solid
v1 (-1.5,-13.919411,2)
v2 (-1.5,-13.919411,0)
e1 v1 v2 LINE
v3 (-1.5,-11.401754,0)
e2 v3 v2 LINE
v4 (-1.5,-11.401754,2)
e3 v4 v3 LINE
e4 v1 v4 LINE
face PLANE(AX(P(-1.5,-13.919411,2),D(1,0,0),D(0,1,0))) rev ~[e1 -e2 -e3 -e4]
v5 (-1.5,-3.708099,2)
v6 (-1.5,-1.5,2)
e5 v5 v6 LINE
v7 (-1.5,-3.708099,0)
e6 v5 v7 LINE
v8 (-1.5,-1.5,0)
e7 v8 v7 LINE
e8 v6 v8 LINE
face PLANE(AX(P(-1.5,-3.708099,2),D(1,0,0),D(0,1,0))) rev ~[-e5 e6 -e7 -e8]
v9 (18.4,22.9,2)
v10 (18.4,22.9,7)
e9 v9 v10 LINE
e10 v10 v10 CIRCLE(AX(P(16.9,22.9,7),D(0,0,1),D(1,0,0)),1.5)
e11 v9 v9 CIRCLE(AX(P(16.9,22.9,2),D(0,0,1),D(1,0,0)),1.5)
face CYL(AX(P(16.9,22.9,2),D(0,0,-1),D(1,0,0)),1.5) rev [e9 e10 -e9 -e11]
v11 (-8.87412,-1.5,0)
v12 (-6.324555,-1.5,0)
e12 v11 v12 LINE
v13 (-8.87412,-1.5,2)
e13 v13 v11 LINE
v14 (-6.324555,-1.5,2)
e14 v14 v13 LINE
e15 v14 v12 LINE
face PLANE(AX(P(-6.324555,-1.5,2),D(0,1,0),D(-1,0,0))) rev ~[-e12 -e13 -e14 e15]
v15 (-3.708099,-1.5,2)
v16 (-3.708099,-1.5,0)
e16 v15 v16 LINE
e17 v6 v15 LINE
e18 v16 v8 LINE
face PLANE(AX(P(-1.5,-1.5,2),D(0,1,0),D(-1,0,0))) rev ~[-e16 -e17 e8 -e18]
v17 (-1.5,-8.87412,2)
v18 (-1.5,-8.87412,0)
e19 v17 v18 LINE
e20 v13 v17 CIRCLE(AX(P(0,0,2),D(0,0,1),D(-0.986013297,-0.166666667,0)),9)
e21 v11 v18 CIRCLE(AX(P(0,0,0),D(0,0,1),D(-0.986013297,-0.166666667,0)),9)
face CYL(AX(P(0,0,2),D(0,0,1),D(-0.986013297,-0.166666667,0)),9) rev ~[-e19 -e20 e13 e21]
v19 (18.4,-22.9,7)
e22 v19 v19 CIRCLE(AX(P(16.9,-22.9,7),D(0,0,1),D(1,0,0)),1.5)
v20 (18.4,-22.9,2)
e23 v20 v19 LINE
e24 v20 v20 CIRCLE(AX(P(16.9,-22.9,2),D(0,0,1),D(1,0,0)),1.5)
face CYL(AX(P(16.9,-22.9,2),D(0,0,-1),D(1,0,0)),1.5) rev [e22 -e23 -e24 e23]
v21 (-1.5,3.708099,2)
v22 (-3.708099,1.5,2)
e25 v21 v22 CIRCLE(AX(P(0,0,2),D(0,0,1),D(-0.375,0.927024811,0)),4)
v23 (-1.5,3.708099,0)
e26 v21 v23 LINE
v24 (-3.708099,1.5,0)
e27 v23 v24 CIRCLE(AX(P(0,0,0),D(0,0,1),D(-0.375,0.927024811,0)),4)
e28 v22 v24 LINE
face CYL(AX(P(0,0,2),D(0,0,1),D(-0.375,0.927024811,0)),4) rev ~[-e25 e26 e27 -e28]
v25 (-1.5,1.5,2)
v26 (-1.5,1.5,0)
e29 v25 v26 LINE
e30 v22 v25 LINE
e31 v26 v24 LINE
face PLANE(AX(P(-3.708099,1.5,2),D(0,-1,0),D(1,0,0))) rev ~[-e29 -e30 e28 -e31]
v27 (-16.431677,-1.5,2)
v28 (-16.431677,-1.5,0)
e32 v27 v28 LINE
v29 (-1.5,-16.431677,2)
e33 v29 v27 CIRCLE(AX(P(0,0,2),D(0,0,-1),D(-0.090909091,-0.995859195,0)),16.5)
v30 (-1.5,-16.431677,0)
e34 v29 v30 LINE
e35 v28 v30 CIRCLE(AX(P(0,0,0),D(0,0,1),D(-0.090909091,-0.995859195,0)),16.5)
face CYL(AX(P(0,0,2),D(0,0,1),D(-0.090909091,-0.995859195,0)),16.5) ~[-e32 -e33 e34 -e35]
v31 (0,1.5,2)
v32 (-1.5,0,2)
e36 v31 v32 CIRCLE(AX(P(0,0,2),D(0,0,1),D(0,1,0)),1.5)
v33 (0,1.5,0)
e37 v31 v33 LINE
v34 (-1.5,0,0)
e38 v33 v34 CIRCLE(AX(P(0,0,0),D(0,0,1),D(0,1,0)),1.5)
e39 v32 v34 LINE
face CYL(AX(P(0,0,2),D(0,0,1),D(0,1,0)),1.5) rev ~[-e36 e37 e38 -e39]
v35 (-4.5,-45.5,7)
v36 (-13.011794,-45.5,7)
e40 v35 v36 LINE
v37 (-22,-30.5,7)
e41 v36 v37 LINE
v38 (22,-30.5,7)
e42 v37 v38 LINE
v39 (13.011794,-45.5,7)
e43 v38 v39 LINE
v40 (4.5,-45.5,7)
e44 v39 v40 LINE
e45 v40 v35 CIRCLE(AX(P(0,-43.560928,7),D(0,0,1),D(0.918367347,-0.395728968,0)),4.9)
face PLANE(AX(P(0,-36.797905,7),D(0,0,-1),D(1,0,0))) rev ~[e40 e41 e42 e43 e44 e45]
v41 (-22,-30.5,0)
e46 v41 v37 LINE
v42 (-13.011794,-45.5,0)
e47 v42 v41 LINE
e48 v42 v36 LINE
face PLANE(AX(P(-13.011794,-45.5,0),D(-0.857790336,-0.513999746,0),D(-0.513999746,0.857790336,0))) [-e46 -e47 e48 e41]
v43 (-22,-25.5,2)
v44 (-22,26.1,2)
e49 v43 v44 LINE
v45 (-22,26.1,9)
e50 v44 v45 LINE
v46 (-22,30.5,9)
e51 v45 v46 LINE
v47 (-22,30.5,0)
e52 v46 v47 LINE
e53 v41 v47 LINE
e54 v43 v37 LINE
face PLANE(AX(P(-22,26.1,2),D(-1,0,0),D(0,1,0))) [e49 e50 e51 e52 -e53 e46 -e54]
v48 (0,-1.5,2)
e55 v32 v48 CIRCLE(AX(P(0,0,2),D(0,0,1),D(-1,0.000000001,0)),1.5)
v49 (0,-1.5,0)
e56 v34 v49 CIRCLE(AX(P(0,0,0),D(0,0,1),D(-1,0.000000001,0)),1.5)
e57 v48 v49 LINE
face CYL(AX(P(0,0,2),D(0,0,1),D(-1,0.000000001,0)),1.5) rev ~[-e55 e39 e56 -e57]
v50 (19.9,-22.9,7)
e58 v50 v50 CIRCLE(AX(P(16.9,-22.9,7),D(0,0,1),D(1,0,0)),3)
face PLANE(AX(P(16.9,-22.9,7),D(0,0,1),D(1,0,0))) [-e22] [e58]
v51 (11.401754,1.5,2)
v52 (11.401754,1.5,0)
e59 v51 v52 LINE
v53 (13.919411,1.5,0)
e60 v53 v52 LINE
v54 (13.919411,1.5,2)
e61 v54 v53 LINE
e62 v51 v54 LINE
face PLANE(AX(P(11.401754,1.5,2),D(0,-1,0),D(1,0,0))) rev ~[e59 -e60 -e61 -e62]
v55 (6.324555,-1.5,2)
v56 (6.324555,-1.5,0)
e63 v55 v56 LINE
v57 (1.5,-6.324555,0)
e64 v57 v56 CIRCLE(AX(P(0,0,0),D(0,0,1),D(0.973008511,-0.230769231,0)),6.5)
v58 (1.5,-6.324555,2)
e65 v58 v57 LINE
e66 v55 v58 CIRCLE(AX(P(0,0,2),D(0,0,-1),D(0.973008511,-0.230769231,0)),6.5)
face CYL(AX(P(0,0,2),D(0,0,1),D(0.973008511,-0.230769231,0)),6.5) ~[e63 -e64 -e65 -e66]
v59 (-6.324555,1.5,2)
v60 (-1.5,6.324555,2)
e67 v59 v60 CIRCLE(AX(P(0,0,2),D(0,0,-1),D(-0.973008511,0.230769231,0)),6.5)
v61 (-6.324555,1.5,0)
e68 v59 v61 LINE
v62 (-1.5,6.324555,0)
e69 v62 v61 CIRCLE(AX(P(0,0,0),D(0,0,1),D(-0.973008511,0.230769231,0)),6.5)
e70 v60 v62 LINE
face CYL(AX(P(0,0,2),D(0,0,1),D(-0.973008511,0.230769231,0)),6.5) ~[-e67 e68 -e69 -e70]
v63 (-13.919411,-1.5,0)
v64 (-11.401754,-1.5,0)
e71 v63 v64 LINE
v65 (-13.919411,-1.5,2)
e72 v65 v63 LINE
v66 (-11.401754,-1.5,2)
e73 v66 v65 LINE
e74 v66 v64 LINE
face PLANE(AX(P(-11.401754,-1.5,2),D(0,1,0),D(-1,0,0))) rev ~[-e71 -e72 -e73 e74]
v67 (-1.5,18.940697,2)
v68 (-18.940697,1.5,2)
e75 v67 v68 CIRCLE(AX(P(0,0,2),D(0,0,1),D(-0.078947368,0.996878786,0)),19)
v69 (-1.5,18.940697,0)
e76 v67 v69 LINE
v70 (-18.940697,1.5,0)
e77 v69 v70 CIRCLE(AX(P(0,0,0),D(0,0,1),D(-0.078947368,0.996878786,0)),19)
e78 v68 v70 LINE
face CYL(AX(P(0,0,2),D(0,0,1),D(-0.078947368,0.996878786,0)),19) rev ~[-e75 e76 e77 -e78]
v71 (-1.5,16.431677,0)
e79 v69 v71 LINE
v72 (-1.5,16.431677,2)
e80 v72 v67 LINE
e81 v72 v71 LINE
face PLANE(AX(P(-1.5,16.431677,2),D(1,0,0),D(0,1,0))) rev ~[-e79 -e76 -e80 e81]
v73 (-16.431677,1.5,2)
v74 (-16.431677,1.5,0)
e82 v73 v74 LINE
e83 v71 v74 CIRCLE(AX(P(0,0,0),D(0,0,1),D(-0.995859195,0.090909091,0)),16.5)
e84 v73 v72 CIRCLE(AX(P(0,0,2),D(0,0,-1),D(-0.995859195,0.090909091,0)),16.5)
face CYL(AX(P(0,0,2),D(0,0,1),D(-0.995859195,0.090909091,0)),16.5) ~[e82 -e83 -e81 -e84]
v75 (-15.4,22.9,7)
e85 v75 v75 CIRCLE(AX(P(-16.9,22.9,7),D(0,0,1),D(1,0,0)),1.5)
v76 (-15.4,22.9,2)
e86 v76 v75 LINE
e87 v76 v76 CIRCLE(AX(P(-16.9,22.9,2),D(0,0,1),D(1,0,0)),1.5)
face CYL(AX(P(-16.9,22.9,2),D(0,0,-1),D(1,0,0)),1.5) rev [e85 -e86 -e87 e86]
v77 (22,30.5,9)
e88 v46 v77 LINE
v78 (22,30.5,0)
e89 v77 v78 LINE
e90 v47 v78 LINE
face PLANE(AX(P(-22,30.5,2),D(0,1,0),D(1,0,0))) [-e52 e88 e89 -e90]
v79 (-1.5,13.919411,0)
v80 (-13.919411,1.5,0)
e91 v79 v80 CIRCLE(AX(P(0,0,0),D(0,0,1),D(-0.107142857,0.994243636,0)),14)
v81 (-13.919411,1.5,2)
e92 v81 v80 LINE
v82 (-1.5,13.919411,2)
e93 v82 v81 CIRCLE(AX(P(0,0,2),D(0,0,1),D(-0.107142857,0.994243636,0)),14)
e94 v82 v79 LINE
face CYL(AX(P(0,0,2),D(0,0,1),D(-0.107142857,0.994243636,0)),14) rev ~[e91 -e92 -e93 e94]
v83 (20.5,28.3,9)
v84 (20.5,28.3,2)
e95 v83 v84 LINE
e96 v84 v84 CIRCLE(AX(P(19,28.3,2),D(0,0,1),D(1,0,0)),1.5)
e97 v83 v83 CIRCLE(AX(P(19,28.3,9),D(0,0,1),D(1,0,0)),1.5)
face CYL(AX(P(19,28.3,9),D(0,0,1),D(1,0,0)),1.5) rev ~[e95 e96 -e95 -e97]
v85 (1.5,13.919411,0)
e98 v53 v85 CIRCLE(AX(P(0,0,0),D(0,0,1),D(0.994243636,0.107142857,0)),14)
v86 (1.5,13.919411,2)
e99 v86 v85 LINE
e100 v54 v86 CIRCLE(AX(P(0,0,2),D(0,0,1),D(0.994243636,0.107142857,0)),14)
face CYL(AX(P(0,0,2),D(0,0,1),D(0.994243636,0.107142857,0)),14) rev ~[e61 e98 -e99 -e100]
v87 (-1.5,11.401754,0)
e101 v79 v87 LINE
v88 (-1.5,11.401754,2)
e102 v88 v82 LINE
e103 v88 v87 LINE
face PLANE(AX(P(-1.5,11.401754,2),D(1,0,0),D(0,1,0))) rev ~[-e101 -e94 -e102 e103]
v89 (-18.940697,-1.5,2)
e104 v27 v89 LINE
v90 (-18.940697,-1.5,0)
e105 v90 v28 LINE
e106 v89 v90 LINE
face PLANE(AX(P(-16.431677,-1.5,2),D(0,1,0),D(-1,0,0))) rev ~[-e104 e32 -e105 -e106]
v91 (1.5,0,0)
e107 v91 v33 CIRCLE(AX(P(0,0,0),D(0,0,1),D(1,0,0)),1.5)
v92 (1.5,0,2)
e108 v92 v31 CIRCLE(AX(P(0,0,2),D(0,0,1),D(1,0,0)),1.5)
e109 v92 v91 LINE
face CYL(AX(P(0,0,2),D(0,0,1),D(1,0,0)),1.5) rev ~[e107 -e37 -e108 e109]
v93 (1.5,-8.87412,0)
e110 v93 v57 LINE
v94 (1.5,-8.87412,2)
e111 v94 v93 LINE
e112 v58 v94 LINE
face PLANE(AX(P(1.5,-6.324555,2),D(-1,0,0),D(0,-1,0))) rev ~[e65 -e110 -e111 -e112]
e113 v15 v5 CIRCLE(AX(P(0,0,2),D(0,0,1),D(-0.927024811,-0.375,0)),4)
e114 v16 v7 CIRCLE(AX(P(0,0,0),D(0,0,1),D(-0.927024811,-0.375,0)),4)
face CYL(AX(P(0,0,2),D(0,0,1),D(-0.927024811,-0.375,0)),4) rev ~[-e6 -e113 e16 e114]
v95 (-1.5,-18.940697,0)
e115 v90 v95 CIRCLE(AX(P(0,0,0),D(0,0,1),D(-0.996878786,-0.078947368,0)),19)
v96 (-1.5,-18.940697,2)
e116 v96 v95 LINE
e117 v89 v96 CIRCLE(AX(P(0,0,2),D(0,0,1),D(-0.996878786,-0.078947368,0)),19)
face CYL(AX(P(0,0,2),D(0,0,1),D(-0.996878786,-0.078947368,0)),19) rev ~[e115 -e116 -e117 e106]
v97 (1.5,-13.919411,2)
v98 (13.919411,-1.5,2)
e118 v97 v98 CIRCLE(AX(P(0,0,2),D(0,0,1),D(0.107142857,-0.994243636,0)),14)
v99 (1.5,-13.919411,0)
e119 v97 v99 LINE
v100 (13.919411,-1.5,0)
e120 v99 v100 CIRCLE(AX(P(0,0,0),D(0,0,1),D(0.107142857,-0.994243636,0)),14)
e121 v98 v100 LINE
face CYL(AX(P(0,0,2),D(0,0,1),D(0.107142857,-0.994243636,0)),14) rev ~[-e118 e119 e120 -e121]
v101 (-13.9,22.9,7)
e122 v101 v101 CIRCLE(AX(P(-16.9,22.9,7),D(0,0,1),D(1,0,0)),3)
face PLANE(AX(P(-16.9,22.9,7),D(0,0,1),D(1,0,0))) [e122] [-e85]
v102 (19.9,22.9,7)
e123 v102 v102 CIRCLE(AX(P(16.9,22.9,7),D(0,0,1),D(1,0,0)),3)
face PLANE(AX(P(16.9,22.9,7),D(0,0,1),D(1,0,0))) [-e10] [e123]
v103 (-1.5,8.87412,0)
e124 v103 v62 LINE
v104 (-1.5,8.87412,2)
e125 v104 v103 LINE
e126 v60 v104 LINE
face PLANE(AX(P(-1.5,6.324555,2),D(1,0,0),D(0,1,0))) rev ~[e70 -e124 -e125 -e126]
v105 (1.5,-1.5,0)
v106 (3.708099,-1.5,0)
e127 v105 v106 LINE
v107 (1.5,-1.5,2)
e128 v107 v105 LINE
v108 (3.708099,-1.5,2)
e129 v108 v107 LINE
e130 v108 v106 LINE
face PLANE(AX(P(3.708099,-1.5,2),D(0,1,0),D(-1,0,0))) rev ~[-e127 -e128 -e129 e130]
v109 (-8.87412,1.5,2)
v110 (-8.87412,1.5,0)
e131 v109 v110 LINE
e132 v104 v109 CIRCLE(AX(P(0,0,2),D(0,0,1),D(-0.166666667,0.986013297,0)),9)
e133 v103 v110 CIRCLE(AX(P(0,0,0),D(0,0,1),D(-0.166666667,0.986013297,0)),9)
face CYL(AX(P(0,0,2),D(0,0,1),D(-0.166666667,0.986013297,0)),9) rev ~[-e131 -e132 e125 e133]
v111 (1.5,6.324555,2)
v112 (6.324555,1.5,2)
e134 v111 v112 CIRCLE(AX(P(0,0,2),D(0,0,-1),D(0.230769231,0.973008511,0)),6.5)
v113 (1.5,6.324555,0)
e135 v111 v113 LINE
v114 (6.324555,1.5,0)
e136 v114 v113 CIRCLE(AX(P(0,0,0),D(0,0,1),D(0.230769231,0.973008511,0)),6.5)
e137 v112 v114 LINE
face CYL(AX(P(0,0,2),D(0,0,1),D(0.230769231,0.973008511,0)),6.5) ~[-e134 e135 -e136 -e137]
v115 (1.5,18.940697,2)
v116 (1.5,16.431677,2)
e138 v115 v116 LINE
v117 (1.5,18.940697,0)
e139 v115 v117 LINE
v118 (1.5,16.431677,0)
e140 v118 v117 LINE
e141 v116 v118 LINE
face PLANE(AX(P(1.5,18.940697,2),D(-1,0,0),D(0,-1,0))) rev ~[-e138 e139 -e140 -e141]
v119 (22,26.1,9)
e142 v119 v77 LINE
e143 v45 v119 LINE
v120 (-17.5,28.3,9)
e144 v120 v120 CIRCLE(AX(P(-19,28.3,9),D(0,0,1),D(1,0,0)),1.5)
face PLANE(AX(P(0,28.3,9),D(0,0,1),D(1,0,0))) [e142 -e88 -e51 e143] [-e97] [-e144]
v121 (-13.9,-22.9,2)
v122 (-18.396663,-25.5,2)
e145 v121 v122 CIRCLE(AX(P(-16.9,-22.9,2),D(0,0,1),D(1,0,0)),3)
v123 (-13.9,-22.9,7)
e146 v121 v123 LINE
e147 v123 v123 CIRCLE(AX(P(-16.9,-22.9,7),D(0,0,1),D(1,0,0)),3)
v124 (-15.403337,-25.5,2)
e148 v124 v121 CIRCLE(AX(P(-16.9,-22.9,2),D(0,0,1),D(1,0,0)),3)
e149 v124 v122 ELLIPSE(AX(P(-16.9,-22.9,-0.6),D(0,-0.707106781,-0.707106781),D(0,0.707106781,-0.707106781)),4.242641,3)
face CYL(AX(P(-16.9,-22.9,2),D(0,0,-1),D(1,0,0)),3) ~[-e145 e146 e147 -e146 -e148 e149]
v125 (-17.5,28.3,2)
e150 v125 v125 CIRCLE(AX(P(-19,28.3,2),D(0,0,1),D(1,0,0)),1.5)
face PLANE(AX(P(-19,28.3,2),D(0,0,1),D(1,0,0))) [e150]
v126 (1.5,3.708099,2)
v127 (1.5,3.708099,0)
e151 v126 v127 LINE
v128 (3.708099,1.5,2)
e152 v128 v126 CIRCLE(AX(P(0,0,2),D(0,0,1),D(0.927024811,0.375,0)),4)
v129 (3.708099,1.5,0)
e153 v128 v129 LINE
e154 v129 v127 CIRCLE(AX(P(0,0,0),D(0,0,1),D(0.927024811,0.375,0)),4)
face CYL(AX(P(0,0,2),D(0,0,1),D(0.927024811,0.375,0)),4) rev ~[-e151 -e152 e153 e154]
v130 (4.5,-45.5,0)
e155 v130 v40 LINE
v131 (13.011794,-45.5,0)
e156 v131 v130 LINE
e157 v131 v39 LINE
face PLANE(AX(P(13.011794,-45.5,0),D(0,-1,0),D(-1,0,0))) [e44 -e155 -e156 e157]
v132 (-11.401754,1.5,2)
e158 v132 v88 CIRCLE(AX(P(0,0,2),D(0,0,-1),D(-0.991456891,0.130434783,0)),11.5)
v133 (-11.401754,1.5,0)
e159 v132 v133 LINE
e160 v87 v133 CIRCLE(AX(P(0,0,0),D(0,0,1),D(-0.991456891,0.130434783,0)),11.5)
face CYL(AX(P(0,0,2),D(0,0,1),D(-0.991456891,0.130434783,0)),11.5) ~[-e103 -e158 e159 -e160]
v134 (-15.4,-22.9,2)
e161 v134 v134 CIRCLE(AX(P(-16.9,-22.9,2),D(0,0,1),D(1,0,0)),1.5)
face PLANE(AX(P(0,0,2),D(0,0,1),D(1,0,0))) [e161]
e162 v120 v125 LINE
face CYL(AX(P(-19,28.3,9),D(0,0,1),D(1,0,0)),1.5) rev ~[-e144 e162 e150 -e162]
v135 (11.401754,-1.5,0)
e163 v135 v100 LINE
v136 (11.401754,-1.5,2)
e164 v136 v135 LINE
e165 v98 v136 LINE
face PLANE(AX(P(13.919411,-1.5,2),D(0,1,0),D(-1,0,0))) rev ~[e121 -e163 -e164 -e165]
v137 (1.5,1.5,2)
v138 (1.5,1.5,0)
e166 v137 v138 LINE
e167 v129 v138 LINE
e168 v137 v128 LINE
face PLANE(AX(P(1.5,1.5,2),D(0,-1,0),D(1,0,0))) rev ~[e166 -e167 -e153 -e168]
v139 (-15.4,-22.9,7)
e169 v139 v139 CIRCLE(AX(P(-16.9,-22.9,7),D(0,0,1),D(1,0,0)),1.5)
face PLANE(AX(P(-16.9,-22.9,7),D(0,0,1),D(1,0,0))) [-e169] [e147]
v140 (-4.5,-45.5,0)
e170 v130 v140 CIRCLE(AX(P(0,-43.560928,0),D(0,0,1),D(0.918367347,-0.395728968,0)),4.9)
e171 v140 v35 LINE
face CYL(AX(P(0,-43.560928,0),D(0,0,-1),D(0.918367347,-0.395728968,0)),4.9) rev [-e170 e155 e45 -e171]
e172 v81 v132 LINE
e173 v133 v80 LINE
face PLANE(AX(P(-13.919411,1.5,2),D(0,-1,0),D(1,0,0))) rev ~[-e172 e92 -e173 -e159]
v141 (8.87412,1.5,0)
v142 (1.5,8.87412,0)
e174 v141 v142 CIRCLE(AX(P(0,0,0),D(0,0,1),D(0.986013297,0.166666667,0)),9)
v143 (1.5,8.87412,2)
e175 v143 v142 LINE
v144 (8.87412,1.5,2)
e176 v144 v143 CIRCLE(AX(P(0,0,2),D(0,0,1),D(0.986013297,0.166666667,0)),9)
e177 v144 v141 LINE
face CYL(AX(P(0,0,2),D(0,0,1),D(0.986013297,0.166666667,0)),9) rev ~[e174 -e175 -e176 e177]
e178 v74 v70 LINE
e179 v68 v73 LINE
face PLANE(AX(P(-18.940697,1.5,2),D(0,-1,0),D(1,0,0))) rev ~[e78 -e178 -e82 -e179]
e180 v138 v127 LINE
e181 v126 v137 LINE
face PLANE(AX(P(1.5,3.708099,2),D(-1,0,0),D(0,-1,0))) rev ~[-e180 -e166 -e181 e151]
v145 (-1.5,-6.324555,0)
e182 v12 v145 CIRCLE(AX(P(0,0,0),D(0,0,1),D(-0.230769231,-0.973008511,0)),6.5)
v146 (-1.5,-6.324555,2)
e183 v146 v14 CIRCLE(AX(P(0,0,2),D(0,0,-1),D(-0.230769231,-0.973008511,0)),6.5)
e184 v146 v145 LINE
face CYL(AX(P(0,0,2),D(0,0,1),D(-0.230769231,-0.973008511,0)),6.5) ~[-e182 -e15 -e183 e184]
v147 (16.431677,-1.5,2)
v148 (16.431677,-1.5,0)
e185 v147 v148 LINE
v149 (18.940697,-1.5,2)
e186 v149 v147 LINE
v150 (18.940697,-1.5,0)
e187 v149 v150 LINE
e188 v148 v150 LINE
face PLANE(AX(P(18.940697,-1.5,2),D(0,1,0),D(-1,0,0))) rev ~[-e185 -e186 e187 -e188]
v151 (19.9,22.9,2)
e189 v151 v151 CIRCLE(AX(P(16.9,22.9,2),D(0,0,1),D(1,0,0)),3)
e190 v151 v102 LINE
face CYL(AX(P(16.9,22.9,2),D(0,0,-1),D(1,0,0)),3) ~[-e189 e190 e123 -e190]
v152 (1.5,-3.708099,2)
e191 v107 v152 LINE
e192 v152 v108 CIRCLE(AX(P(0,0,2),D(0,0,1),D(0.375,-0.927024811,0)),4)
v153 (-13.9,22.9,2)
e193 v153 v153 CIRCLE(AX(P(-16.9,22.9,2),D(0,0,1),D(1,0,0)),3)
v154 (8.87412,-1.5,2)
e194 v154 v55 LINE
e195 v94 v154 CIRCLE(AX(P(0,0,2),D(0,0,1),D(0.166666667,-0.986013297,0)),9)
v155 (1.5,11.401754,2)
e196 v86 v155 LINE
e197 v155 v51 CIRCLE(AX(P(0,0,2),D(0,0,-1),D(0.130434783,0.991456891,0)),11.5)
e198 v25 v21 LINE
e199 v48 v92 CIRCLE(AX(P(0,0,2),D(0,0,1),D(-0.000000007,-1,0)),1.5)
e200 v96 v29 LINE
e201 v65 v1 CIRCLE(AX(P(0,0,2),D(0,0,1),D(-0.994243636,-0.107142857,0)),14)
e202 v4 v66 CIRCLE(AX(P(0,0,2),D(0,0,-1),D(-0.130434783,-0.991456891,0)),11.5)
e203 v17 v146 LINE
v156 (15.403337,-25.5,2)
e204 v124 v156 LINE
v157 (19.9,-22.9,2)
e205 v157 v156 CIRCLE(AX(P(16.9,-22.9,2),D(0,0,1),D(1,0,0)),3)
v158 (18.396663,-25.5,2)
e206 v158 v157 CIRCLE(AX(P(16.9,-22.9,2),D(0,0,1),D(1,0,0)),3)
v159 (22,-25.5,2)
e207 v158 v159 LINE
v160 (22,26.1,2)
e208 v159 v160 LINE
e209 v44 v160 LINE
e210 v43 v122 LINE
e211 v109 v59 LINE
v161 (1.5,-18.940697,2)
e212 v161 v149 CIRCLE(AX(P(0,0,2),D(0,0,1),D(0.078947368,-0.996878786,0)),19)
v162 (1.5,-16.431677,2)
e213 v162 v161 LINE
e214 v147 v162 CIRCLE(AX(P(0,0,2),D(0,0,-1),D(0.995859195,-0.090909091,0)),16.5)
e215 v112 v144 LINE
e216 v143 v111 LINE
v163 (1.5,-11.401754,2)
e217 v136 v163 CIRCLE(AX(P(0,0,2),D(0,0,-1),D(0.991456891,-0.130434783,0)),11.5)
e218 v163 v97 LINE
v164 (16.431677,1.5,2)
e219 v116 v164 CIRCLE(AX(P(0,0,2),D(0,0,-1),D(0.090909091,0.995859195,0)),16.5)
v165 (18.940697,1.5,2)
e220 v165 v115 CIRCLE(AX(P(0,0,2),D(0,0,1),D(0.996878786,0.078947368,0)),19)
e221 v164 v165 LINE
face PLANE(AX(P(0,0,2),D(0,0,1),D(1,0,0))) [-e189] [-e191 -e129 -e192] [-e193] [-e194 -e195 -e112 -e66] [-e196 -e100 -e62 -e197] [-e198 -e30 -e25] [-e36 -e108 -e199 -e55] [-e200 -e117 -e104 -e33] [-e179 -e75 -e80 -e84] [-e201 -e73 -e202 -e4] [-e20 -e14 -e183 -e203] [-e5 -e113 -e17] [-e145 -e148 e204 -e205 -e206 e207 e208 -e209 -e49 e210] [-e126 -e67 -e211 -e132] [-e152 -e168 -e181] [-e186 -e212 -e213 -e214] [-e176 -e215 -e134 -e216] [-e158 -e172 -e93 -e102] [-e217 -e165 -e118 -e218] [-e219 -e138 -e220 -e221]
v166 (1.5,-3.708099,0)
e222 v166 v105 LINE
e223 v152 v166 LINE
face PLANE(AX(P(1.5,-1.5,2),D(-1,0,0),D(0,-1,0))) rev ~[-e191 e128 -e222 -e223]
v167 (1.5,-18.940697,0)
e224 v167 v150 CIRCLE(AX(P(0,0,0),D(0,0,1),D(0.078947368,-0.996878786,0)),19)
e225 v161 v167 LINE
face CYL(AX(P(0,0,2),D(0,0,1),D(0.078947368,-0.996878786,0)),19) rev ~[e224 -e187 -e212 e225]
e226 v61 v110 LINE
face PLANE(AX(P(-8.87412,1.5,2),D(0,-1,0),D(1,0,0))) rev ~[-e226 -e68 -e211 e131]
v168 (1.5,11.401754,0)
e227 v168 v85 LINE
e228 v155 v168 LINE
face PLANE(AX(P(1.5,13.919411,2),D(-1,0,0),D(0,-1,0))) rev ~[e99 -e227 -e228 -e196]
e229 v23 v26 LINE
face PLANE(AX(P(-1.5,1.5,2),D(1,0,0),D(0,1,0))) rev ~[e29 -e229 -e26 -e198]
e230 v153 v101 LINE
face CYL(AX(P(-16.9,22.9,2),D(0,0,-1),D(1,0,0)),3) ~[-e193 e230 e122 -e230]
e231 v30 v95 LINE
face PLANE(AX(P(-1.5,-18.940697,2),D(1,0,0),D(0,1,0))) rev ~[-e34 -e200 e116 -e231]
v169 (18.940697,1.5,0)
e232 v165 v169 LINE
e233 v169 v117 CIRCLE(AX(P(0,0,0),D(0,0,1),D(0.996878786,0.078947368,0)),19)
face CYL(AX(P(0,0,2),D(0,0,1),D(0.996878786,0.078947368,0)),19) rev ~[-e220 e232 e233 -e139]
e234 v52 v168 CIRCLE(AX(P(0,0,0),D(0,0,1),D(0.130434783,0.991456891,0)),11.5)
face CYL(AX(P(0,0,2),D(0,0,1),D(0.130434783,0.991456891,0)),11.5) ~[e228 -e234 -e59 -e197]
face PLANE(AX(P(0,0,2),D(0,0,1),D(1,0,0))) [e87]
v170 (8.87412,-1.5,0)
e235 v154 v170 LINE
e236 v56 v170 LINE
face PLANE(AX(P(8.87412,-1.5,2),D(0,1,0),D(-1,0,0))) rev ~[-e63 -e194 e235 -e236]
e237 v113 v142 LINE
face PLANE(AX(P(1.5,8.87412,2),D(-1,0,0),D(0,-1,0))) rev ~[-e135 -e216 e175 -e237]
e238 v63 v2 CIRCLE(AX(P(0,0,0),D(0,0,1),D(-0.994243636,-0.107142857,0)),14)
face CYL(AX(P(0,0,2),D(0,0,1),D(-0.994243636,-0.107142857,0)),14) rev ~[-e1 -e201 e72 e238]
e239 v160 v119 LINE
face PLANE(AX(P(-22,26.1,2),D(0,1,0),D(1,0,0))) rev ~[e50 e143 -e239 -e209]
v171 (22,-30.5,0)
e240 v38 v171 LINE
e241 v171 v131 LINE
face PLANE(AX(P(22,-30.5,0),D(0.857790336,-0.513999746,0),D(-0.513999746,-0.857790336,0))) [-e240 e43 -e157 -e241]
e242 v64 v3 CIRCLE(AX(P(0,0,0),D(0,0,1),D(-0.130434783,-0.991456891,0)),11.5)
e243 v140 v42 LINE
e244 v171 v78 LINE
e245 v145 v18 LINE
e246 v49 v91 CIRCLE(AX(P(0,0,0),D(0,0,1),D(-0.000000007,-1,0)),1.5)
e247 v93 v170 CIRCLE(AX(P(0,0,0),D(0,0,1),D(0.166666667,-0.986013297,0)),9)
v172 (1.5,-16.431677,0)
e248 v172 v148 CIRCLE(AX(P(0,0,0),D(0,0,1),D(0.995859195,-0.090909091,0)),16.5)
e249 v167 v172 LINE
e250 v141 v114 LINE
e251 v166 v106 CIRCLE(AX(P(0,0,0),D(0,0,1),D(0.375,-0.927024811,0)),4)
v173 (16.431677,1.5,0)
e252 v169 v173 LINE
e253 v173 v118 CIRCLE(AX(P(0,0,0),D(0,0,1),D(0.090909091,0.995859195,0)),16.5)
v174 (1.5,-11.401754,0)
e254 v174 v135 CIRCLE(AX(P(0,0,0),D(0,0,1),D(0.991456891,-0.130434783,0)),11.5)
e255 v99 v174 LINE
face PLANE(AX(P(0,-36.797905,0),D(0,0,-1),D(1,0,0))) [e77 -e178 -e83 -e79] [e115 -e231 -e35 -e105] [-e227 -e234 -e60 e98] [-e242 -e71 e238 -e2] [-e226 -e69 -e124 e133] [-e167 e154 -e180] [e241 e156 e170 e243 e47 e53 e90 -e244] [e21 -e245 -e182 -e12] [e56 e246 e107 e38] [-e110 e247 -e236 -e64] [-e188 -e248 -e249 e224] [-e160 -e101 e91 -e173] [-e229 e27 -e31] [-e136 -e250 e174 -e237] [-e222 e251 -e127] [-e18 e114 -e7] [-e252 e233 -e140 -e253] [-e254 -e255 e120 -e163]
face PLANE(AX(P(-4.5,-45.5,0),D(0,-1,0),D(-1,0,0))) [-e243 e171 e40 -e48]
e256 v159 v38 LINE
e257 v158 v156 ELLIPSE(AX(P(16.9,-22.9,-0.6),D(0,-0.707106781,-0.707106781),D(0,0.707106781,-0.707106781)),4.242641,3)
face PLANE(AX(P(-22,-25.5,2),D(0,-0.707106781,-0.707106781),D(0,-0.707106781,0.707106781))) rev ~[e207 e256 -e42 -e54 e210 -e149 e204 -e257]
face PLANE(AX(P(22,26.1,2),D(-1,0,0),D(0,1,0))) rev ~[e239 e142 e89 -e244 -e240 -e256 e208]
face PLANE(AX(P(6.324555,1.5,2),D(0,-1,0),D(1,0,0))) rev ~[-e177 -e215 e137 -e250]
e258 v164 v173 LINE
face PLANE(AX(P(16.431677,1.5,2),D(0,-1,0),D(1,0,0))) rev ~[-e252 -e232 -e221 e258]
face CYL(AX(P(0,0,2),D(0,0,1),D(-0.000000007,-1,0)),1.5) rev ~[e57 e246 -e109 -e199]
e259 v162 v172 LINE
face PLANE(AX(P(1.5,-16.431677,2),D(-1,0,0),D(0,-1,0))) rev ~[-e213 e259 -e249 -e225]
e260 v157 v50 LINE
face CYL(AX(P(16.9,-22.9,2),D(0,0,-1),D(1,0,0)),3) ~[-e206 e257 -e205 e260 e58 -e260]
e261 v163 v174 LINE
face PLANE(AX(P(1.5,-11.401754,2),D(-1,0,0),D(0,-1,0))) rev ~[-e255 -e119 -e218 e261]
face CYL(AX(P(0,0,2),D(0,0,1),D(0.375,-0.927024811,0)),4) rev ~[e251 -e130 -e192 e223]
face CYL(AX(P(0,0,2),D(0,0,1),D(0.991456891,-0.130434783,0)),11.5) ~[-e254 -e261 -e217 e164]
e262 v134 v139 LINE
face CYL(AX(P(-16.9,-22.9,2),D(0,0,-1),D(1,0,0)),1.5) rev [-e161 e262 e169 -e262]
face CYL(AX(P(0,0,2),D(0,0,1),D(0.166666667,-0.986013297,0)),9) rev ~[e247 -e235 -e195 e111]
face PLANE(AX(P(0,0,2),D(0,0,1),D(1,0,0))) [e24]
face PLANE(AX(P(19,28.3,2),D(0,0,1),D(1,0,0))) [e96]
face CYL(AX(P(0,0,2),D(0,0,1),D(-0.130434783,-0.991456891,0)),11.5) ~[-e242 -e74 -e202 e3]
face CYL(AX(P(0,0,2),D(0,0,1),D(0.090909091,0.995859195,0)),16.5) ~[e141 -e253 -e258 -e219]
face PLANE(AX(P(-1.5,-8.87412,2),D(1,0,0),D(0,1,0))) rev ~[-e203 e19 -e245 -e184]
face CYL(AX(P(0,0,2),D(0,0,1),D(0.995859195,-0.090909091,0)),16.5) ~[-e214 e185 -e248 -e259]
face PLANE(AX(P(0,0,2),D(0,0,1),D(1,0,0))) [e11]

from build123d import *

# Parameters (mm, degrees)
F0_W        = 44
F0_H        = 61
F1_DEPTH    = 2
F3_DEPTH    = 7
F4_R        = 3
F4_R_2      = 1.5
F5_DEPTH    = 5
F6_T4_DEPTH = 44
F7_W        = 44
F7_H        = 4.4
F8_DEPTH    = 7
F9_R        = 1.5
F10_DEPTH   = 7
F12_DEPTH   = 2.001


# Not quite as in the source:
# - a fillet or chamfer that OpenCascade refuses, or shapes differently, is made with other operations: its cross-section is extruded or revolved along the edge and cut away or added


with BuildPart() as f1:
    # F0 (on Top) → F1 (new body)
    with BuildSketch(Plane.XY):
        Rectangle(F0_W, F0_H)
    extrude(amount=F1_DEPTH)

    # F2 (on face) → F3 (join)
    with BuildSketch(Plane(origin=(0, 0, 0), x_dir=(1, 0, 0), z_dir=(0, 0, -1))):
        with BuildLine():
            Line((-13.0117940697, 45.5), (-22, 30.5))
            Line((-22, 30.5), (22, 30.5))
            Line((22, 30.5), (13.0117940697, 45.5))
            Line((13.0117940697, 45.5), (4.5, 45.5))
            ThreePointArc((4.5, 45.5), (0, 38.660928057), (-4.5, 45.5))
            Line((-4.5, 45.5), (-13.0117940697, 45.5))
        make_face()
    extrude(amount=-F3_DEPTH)

    # F4 (on face) → F5 (join)
    with BuildSketch(Plane.XY.offset(2)):
        with Locations((-16.9, 22.9)):
            Circle(F4_R)
        with Locations((-16.9, 22.9)):
            Circle(F4_R_2, mode=Mode.SUBTRACT)
        with Locations((16.9, 22.9)):
            Circle(F4_R)
        with Locations((16.9, 22.9)):
            Circle(F4_R_2, mode=Mode.SUBTRACT)
        with Locations((16.9, -22.9)):
            Circle(F4_R)
        with Locations((16.9, -22.9)):
            Circle(F4_R_2, mode=Mode.SUBTRACT)
        with Locations((-16.9, -22.9)):
            Circle(F4_R)
        with Locations((-16.9, -22.9)):
            Circle(F4_R_2, mode=Mode.SUBTRACT)
    extrude(amount=F5_DEPTH)

    # F6: chamfer of 5 on 1 edges, made by hand


with BuildPart() as f6_tool2:
    # F6_s3 → F6_t4 (new body)
    with BuildSketch(Plane.YZ.offset(-22)):
        Polygon((-25.5, 2), (-30.5, 7), (-30.5, 2), align=None)
    extrude(amount=F6_T4_DEPTH)

    split(bisect_by=Plane(origin=(29.6352662025, -17.7578583619, 0), x_dir=(0, 0, 1), z_dir=(-0.8577903364, 0.5139997459, 0)), keep=Keep.TOP)

    split(bisect_by=Plane.XY.offset(7), keep=Keep.BOTTOM)

    split(bisect_by=Plane(origin=(-29.6352662025, -17.7578583619, 0), x_dir=(0, 0, 1), z_dir=(0.8577903364, 0.5139997459, 0)), keep=Keep.TOP)


with BuildPart() as f1_1:
    add(f1.part)

    # F6_t1: union F6_tool2
    add(f6_tool2.part)

    # F7 (on face) → F8 (join)
    with BuildSketch(Plane.XY.offset(2)):
        with Locations((0, 28.3)):
            Rectangle(F7_W, F7_H)
    extrude(amount=F8_DEPTH)

    # F9 (on face) → F10 (cut)
    with BuildSketch(Plane.XY.offset(9)):
        with Locations((-19, 28.3)):
            Circle(F9_R)
        with Locations((19, 28.3)):
            Circle(F9_R)
    extrude(amount=-F10_DEPTH, mode=Mode.SUBTRACT)

    # F11 (on face) → F12 (cut, through all)
    with BuildSketch(Plane.XY.offset(2)):
        with BuildLine():
            Line((16.4316767252, 1.5), (18.9406969249, 1.5))
            ThreePointArc((18.9406969249, 1.5), (13.4350288425, 13.4350288425), (1.5, 18.9406969249))
            Line((1.5, 18.9406969249), (1.5, 16.4316767252))
            ThreePointArc((1.5, 16.4316767252), (11.6672618896, 11.6672618896), (16.4316767252, 1.5))
        make_face()
        with BuildLine():
            ThreePointArc((1.5, -18.9406969249), (13.4350288425, -13.4350288425), (18.9406969249, -1.5))
            Line((18.9406969249, -1.5), (16.4316767252, -1.5))
            ThreePointArc((16.4316767252, -1.5), (11.6672618896, -11.6672618896), (1.5, -16.4316767252))
            Line((1.5, -16.4316767252), (1.5, -18.9406969249))
        make_face()
        with BuildLine():
            Line((-1.5, 16.4316767252), (-1.5, 18.9406969249))
            ThreePointArc((-1.5, 18.9406969249), (-13.4350288425, 13.4350288425), (-18.9406969249, 1.5))
            Line((-18.9406969249, 1.5), (-16.4316767252, 1.5))
            ThreePointArc((-16.4316767252, 1.5), (-11.6672618896, 11.6672618896), (-1.5, 16.4316767252))
        make_face()
        with BuildLine():
            Line((11.401754251, 1.5), (13.9194109071, 1.5))
            ThreePointArc((13.9194109071, 1.5), (9.8994949366, 9.8994949366), (1.5, 13.9194109071))
            Line((1.5, 13.9194109071), (1.5, 11.401754251))
            ThreePointArc((1.5, 11.401754251), (8.1317279836, 8.1317279836), (11.401754251, 1.5))
        make_face()
        with BuildLine():
            ThreePointArc((-18.9406969249, -1.5), (-13.4350288425, -13.4350288425), (-1.5, -18.9406969249))
            Line((-1.5, -18.9406969249), (-1.5, -16.4316767252))
            ThreePointArc((-1.5, -16.4316767252), (-11.6672618896, -11.6672618896), (-16.4316767252, -1.5))
            Line((-16.4316767252, -1.5), (-18.9406969249, -1.5))
        make_face()
        with BuildLine():
            ThreePointArc((1.5, -13.9194109071), (9.8994949366, -9.8994949366), (13.9194109071, -1.5))
            Line((13.9194109071, -1.5), (11.401754251, -1.5))
            ThreePointArc((11.401754251, -1.5), (8.1317279836, -8.1317279836), (1.5, -11.401754251))
            Line((1.5, -11.401754251), (1.5, -13.9194109071))
        make_face()
        with BuildLine():
            Line((-1.5, 11.401754251), (-1.5, 13.9194109071))
            ThreePointArc((-1.5, 13.9194109071), (-9.8994949366, 9.8994949366), (-13.9194109071, 1.5))
            Line((-13.9194109071, 1.5), (-11.401754251, 1.5))
            ThreePointArc((-11.401754251, 1.5), (-8.1317279836, 8.1317279836), (-1.5, 11.401754251))
        make_face()
        with BuildLine():
            Line((6.3245553203, 1.5), (8.8741196746, 1.5))
            ThreePointArc((8.8741196746, 1.5), (6.3639610307, 6.3639610307), (1.5, 8.8741196746))
            Line((1.5, 8.8741196746), (1.5, 6.3245553203))
            ThreePointArc((1.5, 6.3245553203), (4.5961940777, 4.5961940777), (6.3245553203, 1.5))
        make_face()
        with BuildLine():
            ThreePointArc((-13.9194109071, -1.5), (-9.8994949366, -9.8994949366), (-1.5, -13.9194109071))
            Line((-1.5, -13.9194109071), (-1.5, -11.401754251))
            ThreePointArc((-1.5, -11.401754251), (-8.1317279836, -8.1317279836), (-11.401754251, -1.5))
            Line((-11.401754251, -1.5), (-13.9194109071, -1.5))
        make_face()
        with BuildLine():
            ThreePointArc((1.5, -8.8741196746), (6.3639610307, -6.3639610307), (8.8741196746, -1.5))
            Line((8.8741196746, -1.5), (6.3245553203, -1.5))
            ThreePointArc((6.3245553203, -1.5), (4.5961940777, -4.5961940777), (1.5, -6.3245553203))
            Line((1.5, -6.3245553203), (1.5, -8.8741196746))
        make_face()
        with BuildLine():
            Line((-1.5, 6.3245553203), (-1.5, 8.8741196746))
            ThreePointArc((-1.5, 8.8741196746), (-6.3639610307, 6.3639610307), (-8.8741196746, 1.5))
            Line((-8.8741196746, 1.5), (-6.3245553203, 1.5))
            ThreePointArc((-6.3245553203, 1.5), (-4.5961940777, 4.5961940777), (-1.5, 6.3245553203))
        make_face()
        with BuildLine():
            Line((1.5, 1.5), (3.7080992435, 1.5))
            ThreePointArc((3.7080992435, 1.5), (2.8284271247, 2.8284271247), (1.5, 3.7080992435))
            Line((1.5, 3.7080992435), (1.5, 1.5))
        make_face()
        with BuildLine():
            ThreePointArc((-8.8741196746, -1.5), (-6.3639610307, -6.3639610307), (-1.5, -8.8741196746))
            Line((-1.5, -8.8741196746), (-1.5, -6.3245553203))
            ThreePointArc((-1.5, -6.3245553203), (-4.5961940777, -4.5961940777), (-6.3245553203, -1.5))
            Line((-6.3245553203, -1.5), (-8.8741196746, -1.5))
        make_face()
        with BuildLine():
            ThreePointArc((1.5, -3.7080992435), (2.8284271247, -2.8284271247), (3.7080992435, -1.5))
            Line((3.7080992435, -1.5), (1.5, -1.5))
            Line((1.5, -1.5), (1.5, -3.7080992435))
        make_face()
        with BuildLine():
            Line((-1.5, 1.5), (-1.5, 3.7080992435))
            ThreePointArc((-1.5, 3.7080992435), (-2.8284271247, 2.8284271247), (-3.7080992435, 1.5))
            Line((-3.7080992435, 1.5), (-1.5, 1.5))
        make_face()
        with BuildLine():
            ThreePointArc((-1.03e-08, -1.5), (1.0606601681, -1.0606601754), (1.5, 0))
            ThreePointArc((1.5, 0), (1.0606601718, 1.0606601718), (0, 1.5))
            ThreePointArc((0, 1.5), (-1.0606601711, 1.0606601725), (-1.5, 2e-09))
            ThreePointArc((-1.5, 2e-09), (-1.0606601761, -1.0606601674), (-1.03e-08, -1.5))
        make_face()
        with BuildLine():
            ThreePointArc((-3.7080992435, -1.5), (-2.8284271247, -2.8284271247), (-1.5, -3.7080992435))
            Line((-1.5, -3.7080992435), (-1.5, -1.5))
            Line((-1.5, -1.5), (-3.7080992435, -1.5))
        make_face()
    extrude(amount=-F12_DEPTH, mode=Mode.SUBTRACT)


solid = f1_1.part
